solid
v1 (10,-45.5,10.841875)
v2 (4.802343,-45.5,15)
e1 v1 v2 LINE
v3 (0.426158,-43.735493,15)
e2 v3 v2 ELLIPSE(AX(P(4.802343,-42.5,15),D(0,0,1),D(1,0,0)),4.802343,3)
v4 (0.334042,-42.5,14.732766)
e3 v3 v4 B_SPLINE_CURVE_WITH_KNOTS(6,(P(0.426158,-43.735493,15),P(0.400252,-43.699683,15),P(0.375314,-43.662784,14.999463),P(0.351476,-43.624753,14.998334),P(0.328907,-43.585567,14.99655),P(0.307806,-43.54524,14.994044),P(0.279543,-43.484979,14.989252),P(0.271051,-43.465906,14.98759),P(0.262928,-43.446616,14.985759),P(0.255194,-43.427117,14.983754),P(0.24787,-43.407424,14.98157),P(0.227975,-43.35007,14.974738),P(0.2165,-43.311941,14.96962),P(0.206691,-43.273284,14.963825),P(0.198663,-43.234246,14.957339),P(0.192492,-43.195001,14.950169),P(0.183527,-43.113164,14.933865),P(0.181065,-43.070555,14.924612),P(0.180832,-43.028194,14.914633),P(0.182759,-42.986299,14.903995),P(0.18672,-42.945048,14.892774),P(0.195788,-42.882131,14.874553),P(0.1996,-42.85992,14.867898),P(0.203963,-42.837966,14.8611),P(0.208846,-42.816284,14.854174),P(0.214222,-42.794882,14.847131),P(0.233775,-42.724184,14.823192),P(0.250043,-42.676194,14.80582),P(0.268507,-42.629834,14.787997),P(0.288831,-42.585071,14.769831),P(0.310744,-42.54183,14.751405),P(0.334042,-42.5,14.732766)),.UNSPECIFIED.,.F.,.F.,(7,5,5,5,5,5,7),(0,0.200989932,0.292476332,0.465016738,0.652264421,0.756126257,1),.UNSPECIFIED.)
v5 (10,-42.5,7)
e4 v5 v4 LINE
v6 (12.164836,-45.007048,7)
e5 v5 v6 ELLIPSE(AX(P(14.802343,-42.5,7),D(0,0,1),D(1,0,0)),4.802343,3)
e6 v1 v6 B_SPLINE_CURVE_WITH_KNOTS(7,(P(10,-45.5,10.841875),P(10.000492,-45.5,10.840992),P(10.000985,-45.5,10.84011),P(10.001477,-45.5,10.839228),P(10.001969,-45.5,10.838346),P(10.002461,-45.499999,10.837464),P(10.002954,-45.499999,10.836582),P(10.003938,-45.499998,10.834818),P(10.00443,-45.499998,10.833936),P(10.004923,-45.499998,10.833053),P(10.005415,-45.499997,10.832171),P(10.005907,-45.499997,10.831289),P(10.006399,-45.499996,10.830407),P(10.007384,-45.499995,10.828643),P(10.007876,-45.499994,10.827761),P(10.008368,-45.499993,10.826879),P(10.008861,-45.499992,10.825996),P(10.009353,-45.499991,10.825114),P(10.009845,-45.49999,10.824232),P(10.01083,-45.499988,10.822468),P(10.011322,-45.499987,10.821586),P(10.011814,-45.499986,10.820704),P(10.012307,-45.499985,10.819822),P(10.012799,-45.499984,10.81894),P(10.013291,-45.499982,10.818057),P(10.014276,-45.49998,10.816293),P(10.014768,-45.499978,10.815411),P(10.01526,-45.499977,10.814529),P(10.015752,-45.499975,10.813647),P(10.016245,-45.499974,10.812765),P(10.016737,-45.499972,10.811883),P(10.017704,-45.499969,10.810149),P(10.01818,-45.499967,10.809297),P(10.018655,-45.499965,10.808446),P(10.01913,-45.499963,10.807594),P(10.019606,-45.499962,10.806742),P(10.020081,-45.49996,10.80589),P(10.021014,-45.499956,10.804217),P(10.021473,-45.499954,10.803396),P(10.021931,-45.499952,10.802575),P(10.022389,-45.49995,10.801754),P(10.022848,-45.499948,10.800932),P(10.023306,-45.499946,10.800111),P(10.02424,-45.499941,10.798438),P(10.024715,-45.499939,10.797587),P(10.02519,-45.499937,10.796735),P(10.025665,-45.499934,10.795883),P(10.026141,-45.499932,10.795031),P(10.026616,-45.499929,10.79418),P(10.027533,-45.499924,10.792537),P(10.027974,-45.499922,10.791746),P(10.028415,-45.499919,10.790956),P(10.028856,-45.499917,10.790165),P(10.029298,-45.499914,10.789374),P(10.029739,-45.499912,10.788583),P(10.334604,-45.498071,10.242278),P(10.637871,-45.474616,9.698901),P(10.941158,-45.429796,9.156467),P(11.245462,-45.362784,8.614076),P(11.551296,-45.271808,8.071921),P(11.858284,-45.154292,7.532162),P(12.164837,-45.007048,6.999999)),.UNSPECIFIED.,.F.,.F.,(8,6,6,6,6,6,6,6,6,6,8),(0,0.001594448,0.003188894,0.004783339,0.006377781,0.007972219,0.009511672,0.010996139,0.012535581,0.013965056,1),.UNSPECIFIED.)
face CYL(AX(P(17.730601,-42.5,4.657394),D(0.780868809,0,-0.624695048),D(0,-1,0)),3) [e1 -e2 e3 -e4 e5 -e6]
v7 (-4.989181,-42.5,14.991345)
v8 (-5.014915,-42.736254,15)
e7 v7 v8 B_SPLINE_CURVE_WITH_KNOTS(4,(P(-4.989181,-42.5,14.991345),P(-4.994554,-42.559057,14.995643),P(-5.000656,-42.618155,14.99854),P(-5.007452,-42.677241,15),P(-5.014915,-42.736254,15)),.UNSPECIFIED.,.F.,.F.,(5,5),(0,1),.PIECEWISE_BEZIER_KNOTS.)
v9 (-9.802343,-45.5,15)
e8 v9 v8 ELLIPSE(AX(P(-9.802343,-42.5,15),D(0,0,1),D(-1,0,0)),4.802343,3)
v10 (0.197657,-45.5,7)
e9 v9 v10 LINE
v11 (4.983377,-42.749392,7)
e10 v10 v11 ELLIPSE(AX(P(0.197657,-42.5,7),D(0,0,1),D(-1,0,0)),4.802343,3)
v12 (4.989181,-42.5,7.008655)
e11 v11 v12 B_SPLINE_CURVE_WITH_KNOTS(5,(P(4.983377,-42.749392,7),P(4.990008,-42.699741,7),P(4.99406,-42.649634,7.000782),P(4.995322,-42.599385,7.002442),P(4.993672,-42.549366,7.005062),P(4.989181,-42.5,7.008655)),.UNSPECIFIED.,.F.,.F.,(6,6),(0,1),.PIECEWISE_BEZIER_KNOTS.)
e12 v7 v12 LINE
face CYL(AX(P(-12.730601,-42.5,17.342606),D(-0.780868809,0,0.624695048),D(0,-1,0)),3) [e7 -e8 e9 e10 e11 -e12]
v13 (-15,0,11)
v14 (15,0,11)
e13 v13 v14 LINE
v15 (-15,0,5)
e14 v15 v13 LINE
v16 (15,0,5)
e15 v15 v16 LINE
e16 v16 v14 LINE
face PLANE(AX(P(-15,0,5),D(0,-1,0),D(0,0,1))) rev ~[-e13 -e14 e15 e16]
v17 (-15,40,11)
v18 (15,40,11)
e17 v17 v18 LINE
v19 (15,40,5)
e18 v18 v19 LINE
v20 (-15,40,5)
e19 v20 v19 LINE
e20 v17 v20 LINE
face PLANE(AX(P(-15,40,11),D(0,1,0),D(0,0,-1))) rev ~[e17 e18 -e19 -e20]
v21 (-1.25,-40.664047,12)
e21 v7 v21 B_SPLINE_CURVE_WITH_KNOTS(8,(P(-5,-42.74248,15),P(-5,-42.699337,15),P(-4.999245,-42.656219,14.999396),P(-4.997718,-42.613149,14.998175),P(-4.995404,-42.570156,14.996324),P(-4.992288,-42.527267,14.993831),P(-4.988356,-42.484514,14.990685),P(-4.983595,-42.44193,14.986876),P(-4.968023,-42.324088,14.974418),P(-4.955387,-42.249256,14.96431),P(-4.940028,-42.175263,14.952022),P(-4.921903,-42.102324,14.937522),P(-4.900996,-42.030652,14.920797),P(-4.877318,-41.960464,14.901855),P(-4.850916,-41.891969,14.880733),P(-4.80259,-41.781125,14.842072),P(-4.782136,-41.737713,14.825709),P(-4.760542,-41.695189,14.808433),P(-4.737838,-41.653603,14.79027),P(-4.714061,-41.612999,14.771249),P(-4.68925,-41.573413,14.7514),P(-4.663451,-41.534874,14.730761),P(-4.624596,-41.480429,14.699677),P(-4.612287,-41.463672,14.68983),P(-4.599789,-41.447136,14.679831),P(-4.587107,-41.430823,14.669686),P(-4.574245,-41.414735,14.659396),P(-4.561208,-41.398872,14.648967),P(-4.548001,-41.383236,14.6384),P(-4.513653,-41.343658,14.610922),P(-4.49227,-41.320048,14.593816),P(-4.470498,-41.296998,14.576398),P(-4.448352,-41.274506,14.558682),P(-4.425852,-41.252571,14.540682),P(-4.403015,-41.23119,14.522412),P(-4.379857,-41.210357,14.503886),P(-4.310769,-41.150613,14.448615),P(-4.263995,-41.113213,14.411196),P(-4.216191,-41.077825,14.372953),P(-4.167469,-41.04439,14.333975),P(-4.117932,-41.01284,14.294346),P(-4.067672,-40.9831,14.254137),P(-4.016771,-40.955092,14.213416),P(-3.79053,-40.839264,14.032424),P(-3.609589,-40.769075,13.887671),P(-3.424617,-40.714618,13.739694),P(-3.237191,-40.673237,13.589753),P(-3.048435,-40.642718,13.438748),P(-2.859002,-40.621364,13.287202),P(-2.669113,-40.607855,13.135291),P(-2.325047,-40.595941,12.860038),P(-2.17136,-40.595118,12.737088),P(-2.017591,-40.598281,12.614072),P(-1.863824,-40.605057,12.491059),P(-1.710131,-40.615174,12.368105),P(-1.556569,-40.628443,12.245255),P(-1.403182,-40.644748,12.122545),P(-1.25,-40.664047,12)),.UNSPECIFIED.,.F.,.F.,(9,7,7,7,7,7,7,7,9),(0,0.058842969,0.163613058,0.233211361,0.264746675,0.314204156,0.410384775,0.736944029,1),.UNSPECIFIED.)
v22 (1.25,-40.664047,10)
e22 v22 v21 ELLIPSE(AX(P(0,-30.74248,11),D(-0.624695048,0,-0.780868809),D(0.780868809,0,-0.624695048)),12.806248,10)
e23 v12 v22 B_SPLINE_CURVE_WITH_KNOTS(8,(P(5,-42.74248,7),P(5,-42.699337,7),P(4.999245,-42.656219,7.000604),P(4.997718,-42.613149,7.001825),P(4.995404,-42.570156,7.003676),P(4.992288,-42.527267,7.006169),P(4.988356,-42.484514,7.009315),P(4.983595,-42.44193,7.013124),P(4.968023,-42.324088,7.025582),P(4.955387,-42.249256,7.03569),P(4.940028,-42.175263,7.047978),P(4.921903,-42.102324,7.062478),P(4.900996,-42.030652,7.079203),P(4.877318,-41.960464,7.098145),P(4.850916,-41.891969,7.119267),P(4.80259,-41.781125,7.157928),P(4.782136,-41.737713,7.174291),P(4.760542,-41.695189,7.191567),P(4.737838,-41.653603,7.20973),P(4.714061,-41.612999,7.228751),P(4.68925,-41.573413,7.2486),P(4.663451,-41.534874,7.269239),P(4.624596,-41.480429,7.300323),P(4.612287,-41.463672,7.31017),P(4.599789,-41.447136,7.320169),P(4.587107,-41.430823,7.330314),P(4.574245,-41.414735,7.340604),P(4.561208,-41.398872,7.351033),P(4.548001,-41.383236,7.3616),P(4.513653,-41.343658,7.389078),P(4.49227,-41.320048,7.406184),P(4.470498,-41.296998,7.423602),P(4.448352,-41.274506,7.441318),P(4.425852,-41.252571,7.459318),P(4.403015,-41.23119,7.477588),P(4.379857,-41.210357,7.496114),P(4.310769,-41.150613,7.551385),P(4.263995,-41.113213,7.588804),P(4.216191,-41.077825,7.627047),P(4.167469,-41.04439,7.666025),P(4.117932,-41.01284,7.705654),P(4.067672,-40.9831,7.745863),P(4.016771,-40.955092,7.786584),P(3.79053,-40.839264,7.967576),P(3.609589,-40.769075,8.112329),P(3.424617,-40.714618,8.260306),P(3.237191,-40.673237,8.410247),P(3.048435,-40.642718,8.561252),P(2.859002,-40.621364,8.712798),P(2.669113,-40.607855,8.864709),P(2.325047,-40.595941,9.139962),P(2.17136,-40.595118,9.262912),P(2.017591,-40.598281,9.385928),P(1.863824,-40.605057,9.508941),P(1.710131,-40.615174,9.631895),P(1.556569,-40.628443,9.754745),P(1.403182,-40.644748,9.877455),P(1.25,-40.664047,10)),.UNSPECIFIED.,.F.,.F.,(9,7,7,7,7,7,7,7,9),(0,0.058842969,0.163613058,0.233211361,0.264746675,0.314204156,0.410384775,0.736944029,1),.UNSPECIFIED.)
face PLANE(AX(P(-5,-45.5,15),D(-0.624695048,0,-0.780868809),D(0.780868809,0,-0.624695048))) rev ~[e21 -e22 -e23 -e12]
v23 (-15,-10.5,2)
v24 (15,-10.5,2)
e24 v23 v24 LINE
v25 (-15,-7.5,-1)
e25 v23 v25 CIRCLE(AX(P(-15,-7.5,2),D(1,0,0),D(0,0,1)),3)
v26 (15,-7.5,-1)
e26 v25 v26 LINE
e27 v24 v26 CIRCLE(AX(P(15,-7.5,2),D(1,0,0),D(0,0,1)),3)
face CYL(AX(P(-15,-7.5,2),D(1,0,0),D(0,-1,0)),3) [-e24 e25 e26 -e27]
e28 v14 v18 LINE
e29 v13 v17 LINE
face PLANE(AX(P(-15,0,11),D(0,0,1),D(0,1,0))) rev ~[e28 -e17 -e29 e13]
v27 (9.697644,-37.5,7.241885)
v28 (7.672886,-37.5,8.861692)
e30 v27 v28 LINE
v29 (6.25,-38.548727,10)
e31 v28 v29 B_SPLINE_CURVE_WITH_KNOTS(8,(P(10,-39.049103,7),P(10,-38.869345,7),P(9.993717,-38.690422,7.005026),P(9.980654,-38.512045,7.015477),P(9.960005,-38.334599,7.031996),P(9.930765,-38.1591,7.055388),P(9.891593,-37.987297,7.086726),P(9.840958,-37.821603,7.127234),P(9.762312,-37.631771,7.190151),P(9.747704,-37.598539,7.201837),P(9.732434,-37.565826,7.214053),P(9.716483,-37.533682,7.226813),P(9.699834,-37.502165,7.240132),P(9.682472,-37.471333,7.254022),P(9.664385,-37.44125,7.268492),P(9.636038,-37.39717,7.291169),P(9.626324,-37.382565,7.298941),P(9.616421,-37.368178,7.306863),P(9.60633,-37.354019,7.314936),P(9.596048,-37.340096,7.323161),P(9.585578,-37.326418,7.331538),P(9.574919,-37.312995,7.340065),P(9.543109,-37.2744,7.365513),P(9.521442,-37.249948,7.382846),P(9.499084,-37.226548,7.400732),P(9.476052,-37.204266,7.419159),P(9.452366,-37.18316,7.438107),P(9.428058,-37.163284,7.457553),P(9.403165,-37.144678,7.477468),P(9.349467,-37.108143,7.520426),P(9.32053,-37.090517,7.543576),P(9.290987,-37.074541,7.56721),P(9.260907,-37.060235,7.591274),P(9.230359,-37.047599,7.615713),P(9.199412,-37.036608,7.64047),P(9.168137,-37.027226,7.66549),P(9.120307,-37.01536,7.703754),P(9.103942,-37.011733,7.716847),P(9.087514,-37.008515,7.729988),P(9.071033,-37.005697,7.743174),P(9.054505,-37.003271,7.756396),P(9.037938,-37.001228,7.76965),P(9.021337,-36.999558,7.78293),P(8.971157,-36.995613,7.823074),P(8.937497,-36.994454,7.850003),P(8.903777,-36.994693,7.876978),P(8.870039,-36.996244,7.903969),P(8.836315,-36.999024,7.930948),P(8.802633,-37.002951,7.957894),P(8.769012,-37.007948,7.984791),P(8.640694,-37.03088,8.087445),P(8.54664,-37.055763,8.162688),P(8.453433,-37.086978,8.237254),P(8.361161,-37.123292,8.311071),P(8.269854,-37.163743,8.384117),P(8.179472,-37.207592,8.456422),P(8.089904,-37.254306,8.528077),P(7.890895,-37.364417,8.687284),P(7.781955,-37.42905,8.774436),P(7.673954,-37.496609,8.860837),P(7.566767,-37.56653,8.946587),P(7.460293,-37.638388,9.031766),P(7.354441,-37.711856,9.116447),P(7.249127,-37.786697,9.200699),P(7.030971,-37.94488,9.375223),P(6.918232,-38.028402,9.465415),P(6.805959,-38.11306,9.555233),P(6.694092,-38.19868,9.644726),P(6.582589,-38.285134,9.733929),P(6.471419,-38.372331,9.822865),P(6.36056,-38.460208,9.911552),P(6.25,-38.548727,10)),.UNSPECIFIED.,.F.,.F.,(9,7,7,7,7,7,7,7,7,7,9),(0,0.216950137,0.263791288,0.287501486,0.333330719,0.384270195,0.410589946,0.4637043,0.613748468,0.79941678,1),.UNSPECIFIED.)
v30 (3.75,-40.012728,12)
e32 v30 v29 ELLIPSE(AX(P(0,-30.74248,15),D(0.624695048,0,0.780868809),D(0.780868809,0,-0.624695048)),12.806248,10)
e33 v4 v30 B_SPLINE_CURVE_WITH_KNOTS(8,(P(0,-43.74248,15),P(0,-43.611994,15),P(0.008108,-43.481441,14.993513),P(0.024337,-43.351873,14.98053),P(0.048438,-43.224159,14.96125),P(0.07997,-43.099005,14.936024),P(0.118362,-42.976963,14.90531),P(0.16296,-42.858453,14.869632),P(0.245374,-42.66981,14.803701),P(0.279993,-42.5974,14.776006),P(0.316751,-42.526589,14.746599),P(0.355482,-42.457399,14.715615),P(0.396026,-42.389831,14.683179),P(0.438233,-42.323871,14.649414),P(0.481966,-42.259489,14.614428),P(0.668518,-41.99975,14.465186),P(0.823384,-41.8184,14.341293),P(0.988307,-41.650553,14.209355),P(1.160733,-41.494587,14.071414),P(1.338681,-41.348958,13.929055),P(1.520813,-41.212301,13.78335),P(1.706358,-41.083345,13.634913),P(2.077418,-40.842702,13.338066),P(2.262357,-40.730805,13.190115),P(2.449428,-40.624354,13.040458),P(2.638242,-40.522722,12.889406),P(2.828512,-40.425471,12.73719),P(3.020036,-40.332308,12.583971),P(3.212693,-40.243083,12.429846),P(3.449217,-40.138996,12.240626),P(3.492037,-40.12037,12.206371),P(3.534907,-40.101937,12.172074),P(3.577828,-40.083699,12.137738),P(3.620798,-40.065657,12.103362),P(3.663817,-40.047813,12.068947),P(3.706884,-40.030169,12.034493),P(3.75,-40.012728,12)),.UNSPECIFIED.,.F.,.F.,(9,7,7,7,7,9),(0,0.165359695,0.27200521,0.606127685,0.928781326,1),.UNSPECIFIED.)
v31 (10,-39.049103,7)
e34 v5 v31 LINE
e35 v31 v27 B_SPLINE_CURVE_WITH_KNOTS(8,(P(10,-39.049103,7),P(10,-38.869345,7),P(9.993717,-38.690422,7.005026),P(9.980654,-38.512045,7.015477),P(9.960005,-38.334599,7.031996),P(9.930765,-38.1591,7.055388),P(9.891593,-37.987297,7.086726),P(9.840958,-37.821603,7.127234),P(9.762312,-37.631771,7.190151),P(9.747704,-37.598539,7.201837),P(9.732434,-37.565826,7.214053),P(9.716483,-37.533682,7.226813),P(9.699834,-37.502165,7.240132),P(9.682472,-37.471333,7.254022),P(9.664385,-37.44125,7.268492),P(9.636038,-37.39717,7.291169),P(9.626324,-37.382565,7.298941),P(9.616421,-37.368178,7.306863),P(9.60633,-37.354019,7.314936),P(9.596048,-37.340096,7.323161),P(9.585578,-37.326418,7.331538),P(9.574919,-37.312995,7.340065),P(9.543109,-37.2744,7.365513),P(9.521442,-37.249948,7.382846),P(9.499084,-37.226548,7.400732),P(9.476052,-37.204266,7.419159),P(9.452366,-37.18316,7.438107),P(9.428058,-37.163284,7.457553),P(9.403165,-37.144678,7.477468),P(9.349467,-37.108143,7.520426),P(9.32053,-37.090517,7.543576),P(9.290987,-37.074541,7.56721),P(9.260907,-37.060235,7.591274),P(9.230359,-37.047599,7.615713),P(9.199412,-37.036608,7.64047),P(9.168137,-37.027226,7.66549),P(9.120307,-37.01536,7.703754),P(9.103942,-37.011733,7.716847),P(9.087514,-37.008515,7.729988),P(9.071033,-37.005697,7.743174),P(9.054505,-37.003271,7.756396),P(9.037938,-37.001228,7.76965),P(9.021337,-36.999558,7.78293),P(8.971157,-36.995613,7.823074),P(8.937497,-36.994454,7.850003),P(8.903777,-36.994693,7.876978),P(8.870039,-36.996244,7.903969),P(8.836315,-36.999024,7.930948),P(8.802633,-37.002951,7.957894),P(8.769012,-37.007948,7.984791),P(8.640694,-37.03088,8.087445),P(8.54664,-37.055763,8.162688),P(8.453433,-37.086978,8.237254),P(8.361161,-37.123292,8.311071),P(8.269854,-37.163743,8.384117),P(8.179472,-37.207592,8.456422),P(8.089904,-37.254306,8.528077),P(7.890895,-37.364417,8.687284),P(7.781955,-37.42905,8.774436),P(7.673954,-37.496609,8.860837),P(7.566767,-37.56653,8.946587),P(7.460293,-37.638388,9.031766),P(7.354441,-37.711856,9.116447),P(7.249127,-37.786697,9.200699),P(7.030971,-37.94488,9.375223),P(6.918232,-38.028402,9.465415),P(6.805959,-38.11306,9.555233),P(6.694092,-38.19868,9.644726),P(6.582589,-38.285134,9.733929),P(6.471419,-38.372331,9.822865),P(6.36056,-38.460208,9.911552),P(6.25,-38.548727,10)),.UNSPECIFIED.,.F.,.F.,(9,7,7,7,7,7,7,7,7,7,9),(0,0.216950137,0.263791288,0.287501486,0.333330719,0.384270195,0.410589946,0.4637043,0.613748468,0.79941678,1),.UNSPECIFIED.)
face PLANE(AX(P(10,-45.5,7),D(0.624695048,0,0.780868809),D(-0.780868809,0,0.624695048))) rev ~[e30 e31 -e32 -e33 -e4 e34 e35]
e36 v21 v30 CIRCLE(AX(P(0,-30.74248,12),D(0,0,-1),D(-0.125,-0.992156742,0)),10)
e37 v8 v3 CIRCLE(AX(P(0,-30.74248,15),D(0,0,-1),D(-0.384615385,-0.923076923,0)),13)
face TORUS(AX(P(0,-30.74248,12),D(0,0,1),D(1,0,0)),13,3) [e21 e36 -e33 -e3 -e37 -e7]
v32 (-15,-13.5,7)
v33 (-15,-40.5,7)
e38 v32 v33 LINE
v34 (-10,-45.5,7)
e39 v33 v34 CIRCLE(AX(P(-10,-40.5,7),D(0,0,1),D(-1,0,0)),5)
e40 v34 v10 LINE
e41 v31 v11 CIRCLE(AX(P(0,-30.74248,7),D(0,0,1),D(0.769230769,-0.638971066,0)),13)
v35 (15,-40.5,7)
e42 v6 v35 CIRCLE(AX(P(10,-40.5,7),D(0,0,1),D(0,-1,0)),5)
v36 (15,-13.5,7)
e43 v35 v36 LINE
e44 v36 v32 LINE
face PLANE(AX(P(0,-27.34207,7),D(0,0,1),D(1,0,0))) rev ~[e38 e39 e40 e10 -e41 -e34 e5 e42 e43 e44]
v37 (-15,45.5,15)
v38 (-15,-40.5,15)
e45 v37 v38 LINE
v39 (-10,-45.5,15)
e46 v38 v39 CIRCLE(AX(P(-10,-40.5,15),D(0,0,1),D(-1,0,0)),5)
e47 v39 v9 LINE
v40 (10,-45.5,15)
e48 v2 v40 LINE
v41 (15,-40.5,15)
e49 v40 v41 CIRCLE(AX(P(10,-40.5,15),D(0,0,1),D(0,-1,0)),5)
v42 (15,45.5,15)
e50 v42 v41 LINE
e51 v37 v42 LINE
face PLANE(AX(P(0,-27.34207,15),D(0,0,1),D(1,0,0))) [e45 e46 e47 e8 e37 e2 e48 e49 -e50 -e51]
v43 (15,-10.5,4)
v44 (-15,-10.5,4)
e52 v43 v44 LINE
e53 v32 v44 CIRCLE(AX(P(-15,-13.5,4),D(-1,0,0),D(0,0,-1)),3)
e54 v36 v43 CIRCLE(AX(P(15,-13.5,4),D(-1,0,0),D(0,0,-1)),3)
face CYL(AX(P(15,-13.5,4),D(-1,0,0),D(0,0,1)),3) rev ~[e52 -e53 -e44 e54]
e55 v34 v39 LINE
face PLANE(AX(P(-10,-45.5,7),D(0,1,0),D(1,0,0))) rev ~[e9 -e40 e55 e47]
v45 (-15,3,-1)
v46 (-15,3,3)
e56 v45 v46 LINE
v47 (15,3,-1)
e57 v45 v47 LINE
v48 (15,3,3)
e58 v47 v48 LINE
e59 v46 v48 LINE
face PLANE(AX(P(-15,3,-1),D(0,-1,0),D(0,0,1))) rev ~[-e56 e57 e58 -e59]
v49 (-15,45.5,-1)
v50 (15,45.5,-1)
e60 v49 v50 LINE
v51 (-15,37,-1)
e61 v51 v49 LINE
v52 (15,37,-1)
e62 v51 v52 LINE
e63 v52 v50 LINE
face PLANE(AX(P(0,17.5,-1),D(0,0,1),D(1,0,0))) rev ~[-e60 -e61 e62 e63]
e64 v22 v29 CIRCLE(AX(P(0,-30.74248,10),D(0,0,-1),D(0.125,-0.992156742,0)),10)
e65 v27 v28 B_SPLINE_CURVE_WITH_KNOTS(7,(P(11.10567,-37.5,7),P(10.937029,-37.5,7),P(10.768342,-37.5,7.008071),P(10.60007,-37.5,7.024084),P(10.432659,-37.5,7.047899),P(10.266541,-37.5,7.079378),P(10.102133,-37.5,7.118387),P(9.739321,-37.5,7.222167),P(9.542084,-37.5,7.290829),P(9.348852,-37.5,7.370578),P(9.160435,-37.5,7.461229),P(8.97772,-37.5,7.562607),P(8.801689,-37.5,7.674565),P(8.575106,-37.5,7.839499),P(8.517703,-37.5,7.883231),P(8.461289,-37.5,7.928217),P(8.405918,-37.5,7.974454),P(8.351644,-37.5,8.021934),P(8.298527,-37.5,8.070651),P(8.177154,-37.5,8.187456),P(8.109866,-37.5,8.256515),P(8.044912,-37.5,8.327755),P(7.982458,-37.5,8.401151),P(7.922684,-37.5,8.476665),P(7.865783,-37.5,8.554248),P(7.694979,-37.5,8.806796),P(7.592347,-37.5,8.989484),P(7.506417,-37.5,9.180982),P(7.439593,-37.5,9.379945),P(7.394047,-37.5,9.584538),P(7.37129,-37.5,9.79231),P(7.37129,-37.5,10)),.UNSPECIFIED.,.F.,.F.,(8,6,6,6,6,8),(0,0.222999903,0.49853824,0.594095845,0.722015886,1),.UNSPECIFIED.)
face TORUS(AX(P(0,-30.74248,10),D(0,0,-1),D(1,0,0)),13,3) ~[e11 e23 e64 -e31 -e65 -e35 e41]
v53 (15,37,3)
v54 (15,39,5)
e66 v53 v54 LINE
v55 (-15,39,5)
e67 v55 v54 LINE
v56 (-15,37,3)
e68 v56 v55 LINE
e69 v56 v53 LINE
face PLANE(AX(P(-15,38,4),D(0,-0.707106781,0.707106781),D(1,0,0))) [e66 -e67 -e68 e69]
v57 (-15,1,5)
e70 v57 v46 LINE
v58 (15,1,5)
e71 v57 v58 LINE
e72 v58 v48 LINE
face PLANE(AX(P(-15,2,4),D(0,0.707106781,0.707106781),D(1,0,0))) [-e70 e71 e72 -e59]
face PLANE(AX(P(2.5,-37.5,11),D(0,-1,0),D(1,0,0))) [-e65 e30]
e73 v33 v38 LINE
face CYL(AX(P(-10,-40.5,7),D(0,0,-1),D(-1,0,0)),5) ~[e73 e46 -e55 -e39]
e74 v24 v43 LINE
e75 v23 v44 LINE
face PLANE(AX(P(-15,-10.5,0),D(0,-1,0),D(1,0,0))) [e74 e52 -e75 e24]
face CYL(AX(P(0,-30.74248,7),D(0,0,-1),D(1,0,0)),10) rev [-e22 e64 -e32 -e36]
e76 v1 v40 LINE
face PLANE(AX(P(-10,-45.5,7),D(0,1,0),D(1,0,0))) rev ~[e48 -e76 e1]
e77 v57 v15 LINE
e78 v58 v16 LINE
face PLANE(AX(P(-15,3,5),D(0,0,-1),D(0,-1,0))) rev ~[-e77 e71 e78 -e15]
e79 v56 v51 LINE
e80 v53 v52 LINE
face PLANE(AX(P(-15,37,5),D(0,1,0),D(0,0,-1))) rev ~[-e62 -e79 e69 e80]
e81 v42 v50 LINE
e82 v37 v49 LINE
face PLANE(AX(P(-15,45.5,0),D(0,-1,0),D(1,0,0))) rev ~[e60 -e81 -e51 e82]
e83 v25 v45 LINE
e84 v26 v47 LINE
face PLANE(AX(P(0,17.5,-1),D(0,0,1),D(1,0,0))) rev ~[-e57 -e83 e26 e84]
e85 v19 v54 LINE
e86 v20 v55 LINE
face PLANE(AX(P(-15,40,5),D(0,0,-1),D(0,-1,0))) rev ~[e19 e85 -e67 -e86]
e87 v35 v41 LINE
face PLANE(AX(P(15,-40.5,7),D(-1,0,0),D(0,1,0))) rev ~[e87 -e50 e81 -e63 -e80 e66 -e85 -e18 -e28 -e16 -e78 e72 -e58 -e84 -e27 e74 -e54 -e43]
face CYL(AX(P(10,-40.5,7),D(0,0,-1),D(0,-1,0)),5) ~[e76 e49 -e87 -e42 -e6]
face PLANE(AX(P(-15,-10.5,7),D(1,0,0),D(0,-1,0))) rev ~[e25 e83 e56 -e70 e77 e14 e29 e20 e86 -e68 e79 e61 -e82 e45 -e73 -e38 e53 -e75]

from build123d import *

# Parameters (mm, degrees)
F0_W          = 30
F0_H          = 56
F1_DEPTH      = 15
F1_DEPTH_BACK = 1
F2_START      = 7
F0_R          = 10
F2_DEPTH      = 8
F3_R          = 3
F4_R          = 3
F6_DEPTH      = 8
F7_T1_DEPTH   = 27.8062484749
F7_T3_DEPTH   = 27.8062484749
F9_DEPTH      = 30
F10_SIZE      = 2


# Not quite as in the source:
# - a fillet or chamfer that OpenCascade refuses, or shapes differently, is made with other operations: its cross-section is extruded or revolved along the edge and cut away or added


with BuildPart() as f1:
    # F0 (on Top) → F1 (new body, two sides)
    with BuildSketch(Plane.XY) as f1_sk:
        with Locations((0, 17.5)):
            Rectangle(F0_W, F0_H)
    extrude(amount=F1_DEPTH)
    extrude(f1_sk.sketch, amount=-F1_DEPTH_BACK)

    # F0 (on Top) → F2 (join)
    with BuildSketch(Plane.XY.offset(F2_START)):
        with BuildLine():
            Line((15, -40.5), (15, -10.5))
            Line((15, -10.5), (-15, -10.5))
            Line((-15, -10.5), (-15, -40.5))
            ThreePointArc((-15, -40.5), (-13.5355339059, -44.0355339059), (-10, -45.5))
            Line((-10, -45.5), (10, -45.5))
            ThreePointArc((10, -45.5), (13.5355339059, -44.0355339059), (15, -40.5))
        make_face()
        with Locations((0, -30.7424795181)):
            Circle(F0_R, mode=Mode.SUBTRACT)
    extrude(amount=F2_DEPTH)

    # F3
    f3_edges = [f1.edges().sort_by_distance(p)[0] for p in [
        (0, -10.5, 7),
        (0, -10.5, -1),
    ]]
    fillet(f3_edges, radius=F3_R)

    # F4
    f4_edges = [f1.edges().sort_by_distance(p)[0] for p in [
        (-10, -30.74248, 15),
        (-10, -30.74248, 7),
    ]]
    fillet(f4_edges, radius=F4_R)

    # F5 (on face) → F6 (cut)
    with BuildSketch(Plane.XZ.offset(45.5)):
        Polygon((10, 7), (0, 15), (-5, 15), (5, 7), align=None)
    extrude(amount=-F6_DEPTH, mode=Mode.SUBTRACT)

    # F7: fillet of radius 3 on 2 edges, made by hand

    # F7_s2 → F7_t1 (cut)
    with BuildSketch(Plane(origin=(-16.2223697294, 0, 12.9778957835), x_dir=(0, 1, 0), z_dir=(0.7808688094, 0, -0.6246950476))):
        with BuildLine():
            ThreePointArc((-45.5, 5.5895569039), (-44.6213203436, 7.7108772474), (-42.5, 8.5895569039))
            Line((-42.5, 8.5895569039), (-45.5, 8.5895569039))
            Line((-45.5, 8.5895569039), (-45.5, 5.5895569039))
        make_face()
    extrude(amount=F7_T1_DEPTH, mode=Mode.SUBTRACT)

    # F7_s4 → F7_t3 (cut)
    with BuildSketch(Plane(origin=(8.5394429001, 0, -6.8315543201), x_dir=(0, 1, 0), z_dir=(-0.7808688094, 0, 0.6246950476))):
        with BuildLine():
            ThreePointArc((-45.5, -14.7130321416), (-44.6213203436, -12.5917117981), (-42.5, -11.7130321416))
            Line((-42.5, -11.7130321416), (-45.5, -11.7130321416))
            Line((-45.5, -11.7130321416), (-45.5, -14.7130321416))
        make_face()
    extrude(amount=F7_T3_DEPTH, mode=Mode.SUBTRACT)

    # F8 (on face) → F9 (cut, through all)
    with BuildSketch(Plane(origin=(-15, 0, 0), x_dir=(0, -1, 0), z_dir=(-1, 0, 0))):
        Polygon((0, 5), (0, 11), (-40, 11), (-40, 10), (-40, 5), (-37, 5), (-37, -1), (-3, -1), (-3, 5), align=None)
    extrude(amount=-F9_DEPTH, mode=Mode.SUBTRACT)

    # F10
    f10_edges = [f1.edges().sort_by_distance(p)[0] for p in [
        (0, 37, 5),
        (0, 3, 5),
    ]]
    chamfer(f10_edges, length=F10_SIZE)


solid = f1.part
